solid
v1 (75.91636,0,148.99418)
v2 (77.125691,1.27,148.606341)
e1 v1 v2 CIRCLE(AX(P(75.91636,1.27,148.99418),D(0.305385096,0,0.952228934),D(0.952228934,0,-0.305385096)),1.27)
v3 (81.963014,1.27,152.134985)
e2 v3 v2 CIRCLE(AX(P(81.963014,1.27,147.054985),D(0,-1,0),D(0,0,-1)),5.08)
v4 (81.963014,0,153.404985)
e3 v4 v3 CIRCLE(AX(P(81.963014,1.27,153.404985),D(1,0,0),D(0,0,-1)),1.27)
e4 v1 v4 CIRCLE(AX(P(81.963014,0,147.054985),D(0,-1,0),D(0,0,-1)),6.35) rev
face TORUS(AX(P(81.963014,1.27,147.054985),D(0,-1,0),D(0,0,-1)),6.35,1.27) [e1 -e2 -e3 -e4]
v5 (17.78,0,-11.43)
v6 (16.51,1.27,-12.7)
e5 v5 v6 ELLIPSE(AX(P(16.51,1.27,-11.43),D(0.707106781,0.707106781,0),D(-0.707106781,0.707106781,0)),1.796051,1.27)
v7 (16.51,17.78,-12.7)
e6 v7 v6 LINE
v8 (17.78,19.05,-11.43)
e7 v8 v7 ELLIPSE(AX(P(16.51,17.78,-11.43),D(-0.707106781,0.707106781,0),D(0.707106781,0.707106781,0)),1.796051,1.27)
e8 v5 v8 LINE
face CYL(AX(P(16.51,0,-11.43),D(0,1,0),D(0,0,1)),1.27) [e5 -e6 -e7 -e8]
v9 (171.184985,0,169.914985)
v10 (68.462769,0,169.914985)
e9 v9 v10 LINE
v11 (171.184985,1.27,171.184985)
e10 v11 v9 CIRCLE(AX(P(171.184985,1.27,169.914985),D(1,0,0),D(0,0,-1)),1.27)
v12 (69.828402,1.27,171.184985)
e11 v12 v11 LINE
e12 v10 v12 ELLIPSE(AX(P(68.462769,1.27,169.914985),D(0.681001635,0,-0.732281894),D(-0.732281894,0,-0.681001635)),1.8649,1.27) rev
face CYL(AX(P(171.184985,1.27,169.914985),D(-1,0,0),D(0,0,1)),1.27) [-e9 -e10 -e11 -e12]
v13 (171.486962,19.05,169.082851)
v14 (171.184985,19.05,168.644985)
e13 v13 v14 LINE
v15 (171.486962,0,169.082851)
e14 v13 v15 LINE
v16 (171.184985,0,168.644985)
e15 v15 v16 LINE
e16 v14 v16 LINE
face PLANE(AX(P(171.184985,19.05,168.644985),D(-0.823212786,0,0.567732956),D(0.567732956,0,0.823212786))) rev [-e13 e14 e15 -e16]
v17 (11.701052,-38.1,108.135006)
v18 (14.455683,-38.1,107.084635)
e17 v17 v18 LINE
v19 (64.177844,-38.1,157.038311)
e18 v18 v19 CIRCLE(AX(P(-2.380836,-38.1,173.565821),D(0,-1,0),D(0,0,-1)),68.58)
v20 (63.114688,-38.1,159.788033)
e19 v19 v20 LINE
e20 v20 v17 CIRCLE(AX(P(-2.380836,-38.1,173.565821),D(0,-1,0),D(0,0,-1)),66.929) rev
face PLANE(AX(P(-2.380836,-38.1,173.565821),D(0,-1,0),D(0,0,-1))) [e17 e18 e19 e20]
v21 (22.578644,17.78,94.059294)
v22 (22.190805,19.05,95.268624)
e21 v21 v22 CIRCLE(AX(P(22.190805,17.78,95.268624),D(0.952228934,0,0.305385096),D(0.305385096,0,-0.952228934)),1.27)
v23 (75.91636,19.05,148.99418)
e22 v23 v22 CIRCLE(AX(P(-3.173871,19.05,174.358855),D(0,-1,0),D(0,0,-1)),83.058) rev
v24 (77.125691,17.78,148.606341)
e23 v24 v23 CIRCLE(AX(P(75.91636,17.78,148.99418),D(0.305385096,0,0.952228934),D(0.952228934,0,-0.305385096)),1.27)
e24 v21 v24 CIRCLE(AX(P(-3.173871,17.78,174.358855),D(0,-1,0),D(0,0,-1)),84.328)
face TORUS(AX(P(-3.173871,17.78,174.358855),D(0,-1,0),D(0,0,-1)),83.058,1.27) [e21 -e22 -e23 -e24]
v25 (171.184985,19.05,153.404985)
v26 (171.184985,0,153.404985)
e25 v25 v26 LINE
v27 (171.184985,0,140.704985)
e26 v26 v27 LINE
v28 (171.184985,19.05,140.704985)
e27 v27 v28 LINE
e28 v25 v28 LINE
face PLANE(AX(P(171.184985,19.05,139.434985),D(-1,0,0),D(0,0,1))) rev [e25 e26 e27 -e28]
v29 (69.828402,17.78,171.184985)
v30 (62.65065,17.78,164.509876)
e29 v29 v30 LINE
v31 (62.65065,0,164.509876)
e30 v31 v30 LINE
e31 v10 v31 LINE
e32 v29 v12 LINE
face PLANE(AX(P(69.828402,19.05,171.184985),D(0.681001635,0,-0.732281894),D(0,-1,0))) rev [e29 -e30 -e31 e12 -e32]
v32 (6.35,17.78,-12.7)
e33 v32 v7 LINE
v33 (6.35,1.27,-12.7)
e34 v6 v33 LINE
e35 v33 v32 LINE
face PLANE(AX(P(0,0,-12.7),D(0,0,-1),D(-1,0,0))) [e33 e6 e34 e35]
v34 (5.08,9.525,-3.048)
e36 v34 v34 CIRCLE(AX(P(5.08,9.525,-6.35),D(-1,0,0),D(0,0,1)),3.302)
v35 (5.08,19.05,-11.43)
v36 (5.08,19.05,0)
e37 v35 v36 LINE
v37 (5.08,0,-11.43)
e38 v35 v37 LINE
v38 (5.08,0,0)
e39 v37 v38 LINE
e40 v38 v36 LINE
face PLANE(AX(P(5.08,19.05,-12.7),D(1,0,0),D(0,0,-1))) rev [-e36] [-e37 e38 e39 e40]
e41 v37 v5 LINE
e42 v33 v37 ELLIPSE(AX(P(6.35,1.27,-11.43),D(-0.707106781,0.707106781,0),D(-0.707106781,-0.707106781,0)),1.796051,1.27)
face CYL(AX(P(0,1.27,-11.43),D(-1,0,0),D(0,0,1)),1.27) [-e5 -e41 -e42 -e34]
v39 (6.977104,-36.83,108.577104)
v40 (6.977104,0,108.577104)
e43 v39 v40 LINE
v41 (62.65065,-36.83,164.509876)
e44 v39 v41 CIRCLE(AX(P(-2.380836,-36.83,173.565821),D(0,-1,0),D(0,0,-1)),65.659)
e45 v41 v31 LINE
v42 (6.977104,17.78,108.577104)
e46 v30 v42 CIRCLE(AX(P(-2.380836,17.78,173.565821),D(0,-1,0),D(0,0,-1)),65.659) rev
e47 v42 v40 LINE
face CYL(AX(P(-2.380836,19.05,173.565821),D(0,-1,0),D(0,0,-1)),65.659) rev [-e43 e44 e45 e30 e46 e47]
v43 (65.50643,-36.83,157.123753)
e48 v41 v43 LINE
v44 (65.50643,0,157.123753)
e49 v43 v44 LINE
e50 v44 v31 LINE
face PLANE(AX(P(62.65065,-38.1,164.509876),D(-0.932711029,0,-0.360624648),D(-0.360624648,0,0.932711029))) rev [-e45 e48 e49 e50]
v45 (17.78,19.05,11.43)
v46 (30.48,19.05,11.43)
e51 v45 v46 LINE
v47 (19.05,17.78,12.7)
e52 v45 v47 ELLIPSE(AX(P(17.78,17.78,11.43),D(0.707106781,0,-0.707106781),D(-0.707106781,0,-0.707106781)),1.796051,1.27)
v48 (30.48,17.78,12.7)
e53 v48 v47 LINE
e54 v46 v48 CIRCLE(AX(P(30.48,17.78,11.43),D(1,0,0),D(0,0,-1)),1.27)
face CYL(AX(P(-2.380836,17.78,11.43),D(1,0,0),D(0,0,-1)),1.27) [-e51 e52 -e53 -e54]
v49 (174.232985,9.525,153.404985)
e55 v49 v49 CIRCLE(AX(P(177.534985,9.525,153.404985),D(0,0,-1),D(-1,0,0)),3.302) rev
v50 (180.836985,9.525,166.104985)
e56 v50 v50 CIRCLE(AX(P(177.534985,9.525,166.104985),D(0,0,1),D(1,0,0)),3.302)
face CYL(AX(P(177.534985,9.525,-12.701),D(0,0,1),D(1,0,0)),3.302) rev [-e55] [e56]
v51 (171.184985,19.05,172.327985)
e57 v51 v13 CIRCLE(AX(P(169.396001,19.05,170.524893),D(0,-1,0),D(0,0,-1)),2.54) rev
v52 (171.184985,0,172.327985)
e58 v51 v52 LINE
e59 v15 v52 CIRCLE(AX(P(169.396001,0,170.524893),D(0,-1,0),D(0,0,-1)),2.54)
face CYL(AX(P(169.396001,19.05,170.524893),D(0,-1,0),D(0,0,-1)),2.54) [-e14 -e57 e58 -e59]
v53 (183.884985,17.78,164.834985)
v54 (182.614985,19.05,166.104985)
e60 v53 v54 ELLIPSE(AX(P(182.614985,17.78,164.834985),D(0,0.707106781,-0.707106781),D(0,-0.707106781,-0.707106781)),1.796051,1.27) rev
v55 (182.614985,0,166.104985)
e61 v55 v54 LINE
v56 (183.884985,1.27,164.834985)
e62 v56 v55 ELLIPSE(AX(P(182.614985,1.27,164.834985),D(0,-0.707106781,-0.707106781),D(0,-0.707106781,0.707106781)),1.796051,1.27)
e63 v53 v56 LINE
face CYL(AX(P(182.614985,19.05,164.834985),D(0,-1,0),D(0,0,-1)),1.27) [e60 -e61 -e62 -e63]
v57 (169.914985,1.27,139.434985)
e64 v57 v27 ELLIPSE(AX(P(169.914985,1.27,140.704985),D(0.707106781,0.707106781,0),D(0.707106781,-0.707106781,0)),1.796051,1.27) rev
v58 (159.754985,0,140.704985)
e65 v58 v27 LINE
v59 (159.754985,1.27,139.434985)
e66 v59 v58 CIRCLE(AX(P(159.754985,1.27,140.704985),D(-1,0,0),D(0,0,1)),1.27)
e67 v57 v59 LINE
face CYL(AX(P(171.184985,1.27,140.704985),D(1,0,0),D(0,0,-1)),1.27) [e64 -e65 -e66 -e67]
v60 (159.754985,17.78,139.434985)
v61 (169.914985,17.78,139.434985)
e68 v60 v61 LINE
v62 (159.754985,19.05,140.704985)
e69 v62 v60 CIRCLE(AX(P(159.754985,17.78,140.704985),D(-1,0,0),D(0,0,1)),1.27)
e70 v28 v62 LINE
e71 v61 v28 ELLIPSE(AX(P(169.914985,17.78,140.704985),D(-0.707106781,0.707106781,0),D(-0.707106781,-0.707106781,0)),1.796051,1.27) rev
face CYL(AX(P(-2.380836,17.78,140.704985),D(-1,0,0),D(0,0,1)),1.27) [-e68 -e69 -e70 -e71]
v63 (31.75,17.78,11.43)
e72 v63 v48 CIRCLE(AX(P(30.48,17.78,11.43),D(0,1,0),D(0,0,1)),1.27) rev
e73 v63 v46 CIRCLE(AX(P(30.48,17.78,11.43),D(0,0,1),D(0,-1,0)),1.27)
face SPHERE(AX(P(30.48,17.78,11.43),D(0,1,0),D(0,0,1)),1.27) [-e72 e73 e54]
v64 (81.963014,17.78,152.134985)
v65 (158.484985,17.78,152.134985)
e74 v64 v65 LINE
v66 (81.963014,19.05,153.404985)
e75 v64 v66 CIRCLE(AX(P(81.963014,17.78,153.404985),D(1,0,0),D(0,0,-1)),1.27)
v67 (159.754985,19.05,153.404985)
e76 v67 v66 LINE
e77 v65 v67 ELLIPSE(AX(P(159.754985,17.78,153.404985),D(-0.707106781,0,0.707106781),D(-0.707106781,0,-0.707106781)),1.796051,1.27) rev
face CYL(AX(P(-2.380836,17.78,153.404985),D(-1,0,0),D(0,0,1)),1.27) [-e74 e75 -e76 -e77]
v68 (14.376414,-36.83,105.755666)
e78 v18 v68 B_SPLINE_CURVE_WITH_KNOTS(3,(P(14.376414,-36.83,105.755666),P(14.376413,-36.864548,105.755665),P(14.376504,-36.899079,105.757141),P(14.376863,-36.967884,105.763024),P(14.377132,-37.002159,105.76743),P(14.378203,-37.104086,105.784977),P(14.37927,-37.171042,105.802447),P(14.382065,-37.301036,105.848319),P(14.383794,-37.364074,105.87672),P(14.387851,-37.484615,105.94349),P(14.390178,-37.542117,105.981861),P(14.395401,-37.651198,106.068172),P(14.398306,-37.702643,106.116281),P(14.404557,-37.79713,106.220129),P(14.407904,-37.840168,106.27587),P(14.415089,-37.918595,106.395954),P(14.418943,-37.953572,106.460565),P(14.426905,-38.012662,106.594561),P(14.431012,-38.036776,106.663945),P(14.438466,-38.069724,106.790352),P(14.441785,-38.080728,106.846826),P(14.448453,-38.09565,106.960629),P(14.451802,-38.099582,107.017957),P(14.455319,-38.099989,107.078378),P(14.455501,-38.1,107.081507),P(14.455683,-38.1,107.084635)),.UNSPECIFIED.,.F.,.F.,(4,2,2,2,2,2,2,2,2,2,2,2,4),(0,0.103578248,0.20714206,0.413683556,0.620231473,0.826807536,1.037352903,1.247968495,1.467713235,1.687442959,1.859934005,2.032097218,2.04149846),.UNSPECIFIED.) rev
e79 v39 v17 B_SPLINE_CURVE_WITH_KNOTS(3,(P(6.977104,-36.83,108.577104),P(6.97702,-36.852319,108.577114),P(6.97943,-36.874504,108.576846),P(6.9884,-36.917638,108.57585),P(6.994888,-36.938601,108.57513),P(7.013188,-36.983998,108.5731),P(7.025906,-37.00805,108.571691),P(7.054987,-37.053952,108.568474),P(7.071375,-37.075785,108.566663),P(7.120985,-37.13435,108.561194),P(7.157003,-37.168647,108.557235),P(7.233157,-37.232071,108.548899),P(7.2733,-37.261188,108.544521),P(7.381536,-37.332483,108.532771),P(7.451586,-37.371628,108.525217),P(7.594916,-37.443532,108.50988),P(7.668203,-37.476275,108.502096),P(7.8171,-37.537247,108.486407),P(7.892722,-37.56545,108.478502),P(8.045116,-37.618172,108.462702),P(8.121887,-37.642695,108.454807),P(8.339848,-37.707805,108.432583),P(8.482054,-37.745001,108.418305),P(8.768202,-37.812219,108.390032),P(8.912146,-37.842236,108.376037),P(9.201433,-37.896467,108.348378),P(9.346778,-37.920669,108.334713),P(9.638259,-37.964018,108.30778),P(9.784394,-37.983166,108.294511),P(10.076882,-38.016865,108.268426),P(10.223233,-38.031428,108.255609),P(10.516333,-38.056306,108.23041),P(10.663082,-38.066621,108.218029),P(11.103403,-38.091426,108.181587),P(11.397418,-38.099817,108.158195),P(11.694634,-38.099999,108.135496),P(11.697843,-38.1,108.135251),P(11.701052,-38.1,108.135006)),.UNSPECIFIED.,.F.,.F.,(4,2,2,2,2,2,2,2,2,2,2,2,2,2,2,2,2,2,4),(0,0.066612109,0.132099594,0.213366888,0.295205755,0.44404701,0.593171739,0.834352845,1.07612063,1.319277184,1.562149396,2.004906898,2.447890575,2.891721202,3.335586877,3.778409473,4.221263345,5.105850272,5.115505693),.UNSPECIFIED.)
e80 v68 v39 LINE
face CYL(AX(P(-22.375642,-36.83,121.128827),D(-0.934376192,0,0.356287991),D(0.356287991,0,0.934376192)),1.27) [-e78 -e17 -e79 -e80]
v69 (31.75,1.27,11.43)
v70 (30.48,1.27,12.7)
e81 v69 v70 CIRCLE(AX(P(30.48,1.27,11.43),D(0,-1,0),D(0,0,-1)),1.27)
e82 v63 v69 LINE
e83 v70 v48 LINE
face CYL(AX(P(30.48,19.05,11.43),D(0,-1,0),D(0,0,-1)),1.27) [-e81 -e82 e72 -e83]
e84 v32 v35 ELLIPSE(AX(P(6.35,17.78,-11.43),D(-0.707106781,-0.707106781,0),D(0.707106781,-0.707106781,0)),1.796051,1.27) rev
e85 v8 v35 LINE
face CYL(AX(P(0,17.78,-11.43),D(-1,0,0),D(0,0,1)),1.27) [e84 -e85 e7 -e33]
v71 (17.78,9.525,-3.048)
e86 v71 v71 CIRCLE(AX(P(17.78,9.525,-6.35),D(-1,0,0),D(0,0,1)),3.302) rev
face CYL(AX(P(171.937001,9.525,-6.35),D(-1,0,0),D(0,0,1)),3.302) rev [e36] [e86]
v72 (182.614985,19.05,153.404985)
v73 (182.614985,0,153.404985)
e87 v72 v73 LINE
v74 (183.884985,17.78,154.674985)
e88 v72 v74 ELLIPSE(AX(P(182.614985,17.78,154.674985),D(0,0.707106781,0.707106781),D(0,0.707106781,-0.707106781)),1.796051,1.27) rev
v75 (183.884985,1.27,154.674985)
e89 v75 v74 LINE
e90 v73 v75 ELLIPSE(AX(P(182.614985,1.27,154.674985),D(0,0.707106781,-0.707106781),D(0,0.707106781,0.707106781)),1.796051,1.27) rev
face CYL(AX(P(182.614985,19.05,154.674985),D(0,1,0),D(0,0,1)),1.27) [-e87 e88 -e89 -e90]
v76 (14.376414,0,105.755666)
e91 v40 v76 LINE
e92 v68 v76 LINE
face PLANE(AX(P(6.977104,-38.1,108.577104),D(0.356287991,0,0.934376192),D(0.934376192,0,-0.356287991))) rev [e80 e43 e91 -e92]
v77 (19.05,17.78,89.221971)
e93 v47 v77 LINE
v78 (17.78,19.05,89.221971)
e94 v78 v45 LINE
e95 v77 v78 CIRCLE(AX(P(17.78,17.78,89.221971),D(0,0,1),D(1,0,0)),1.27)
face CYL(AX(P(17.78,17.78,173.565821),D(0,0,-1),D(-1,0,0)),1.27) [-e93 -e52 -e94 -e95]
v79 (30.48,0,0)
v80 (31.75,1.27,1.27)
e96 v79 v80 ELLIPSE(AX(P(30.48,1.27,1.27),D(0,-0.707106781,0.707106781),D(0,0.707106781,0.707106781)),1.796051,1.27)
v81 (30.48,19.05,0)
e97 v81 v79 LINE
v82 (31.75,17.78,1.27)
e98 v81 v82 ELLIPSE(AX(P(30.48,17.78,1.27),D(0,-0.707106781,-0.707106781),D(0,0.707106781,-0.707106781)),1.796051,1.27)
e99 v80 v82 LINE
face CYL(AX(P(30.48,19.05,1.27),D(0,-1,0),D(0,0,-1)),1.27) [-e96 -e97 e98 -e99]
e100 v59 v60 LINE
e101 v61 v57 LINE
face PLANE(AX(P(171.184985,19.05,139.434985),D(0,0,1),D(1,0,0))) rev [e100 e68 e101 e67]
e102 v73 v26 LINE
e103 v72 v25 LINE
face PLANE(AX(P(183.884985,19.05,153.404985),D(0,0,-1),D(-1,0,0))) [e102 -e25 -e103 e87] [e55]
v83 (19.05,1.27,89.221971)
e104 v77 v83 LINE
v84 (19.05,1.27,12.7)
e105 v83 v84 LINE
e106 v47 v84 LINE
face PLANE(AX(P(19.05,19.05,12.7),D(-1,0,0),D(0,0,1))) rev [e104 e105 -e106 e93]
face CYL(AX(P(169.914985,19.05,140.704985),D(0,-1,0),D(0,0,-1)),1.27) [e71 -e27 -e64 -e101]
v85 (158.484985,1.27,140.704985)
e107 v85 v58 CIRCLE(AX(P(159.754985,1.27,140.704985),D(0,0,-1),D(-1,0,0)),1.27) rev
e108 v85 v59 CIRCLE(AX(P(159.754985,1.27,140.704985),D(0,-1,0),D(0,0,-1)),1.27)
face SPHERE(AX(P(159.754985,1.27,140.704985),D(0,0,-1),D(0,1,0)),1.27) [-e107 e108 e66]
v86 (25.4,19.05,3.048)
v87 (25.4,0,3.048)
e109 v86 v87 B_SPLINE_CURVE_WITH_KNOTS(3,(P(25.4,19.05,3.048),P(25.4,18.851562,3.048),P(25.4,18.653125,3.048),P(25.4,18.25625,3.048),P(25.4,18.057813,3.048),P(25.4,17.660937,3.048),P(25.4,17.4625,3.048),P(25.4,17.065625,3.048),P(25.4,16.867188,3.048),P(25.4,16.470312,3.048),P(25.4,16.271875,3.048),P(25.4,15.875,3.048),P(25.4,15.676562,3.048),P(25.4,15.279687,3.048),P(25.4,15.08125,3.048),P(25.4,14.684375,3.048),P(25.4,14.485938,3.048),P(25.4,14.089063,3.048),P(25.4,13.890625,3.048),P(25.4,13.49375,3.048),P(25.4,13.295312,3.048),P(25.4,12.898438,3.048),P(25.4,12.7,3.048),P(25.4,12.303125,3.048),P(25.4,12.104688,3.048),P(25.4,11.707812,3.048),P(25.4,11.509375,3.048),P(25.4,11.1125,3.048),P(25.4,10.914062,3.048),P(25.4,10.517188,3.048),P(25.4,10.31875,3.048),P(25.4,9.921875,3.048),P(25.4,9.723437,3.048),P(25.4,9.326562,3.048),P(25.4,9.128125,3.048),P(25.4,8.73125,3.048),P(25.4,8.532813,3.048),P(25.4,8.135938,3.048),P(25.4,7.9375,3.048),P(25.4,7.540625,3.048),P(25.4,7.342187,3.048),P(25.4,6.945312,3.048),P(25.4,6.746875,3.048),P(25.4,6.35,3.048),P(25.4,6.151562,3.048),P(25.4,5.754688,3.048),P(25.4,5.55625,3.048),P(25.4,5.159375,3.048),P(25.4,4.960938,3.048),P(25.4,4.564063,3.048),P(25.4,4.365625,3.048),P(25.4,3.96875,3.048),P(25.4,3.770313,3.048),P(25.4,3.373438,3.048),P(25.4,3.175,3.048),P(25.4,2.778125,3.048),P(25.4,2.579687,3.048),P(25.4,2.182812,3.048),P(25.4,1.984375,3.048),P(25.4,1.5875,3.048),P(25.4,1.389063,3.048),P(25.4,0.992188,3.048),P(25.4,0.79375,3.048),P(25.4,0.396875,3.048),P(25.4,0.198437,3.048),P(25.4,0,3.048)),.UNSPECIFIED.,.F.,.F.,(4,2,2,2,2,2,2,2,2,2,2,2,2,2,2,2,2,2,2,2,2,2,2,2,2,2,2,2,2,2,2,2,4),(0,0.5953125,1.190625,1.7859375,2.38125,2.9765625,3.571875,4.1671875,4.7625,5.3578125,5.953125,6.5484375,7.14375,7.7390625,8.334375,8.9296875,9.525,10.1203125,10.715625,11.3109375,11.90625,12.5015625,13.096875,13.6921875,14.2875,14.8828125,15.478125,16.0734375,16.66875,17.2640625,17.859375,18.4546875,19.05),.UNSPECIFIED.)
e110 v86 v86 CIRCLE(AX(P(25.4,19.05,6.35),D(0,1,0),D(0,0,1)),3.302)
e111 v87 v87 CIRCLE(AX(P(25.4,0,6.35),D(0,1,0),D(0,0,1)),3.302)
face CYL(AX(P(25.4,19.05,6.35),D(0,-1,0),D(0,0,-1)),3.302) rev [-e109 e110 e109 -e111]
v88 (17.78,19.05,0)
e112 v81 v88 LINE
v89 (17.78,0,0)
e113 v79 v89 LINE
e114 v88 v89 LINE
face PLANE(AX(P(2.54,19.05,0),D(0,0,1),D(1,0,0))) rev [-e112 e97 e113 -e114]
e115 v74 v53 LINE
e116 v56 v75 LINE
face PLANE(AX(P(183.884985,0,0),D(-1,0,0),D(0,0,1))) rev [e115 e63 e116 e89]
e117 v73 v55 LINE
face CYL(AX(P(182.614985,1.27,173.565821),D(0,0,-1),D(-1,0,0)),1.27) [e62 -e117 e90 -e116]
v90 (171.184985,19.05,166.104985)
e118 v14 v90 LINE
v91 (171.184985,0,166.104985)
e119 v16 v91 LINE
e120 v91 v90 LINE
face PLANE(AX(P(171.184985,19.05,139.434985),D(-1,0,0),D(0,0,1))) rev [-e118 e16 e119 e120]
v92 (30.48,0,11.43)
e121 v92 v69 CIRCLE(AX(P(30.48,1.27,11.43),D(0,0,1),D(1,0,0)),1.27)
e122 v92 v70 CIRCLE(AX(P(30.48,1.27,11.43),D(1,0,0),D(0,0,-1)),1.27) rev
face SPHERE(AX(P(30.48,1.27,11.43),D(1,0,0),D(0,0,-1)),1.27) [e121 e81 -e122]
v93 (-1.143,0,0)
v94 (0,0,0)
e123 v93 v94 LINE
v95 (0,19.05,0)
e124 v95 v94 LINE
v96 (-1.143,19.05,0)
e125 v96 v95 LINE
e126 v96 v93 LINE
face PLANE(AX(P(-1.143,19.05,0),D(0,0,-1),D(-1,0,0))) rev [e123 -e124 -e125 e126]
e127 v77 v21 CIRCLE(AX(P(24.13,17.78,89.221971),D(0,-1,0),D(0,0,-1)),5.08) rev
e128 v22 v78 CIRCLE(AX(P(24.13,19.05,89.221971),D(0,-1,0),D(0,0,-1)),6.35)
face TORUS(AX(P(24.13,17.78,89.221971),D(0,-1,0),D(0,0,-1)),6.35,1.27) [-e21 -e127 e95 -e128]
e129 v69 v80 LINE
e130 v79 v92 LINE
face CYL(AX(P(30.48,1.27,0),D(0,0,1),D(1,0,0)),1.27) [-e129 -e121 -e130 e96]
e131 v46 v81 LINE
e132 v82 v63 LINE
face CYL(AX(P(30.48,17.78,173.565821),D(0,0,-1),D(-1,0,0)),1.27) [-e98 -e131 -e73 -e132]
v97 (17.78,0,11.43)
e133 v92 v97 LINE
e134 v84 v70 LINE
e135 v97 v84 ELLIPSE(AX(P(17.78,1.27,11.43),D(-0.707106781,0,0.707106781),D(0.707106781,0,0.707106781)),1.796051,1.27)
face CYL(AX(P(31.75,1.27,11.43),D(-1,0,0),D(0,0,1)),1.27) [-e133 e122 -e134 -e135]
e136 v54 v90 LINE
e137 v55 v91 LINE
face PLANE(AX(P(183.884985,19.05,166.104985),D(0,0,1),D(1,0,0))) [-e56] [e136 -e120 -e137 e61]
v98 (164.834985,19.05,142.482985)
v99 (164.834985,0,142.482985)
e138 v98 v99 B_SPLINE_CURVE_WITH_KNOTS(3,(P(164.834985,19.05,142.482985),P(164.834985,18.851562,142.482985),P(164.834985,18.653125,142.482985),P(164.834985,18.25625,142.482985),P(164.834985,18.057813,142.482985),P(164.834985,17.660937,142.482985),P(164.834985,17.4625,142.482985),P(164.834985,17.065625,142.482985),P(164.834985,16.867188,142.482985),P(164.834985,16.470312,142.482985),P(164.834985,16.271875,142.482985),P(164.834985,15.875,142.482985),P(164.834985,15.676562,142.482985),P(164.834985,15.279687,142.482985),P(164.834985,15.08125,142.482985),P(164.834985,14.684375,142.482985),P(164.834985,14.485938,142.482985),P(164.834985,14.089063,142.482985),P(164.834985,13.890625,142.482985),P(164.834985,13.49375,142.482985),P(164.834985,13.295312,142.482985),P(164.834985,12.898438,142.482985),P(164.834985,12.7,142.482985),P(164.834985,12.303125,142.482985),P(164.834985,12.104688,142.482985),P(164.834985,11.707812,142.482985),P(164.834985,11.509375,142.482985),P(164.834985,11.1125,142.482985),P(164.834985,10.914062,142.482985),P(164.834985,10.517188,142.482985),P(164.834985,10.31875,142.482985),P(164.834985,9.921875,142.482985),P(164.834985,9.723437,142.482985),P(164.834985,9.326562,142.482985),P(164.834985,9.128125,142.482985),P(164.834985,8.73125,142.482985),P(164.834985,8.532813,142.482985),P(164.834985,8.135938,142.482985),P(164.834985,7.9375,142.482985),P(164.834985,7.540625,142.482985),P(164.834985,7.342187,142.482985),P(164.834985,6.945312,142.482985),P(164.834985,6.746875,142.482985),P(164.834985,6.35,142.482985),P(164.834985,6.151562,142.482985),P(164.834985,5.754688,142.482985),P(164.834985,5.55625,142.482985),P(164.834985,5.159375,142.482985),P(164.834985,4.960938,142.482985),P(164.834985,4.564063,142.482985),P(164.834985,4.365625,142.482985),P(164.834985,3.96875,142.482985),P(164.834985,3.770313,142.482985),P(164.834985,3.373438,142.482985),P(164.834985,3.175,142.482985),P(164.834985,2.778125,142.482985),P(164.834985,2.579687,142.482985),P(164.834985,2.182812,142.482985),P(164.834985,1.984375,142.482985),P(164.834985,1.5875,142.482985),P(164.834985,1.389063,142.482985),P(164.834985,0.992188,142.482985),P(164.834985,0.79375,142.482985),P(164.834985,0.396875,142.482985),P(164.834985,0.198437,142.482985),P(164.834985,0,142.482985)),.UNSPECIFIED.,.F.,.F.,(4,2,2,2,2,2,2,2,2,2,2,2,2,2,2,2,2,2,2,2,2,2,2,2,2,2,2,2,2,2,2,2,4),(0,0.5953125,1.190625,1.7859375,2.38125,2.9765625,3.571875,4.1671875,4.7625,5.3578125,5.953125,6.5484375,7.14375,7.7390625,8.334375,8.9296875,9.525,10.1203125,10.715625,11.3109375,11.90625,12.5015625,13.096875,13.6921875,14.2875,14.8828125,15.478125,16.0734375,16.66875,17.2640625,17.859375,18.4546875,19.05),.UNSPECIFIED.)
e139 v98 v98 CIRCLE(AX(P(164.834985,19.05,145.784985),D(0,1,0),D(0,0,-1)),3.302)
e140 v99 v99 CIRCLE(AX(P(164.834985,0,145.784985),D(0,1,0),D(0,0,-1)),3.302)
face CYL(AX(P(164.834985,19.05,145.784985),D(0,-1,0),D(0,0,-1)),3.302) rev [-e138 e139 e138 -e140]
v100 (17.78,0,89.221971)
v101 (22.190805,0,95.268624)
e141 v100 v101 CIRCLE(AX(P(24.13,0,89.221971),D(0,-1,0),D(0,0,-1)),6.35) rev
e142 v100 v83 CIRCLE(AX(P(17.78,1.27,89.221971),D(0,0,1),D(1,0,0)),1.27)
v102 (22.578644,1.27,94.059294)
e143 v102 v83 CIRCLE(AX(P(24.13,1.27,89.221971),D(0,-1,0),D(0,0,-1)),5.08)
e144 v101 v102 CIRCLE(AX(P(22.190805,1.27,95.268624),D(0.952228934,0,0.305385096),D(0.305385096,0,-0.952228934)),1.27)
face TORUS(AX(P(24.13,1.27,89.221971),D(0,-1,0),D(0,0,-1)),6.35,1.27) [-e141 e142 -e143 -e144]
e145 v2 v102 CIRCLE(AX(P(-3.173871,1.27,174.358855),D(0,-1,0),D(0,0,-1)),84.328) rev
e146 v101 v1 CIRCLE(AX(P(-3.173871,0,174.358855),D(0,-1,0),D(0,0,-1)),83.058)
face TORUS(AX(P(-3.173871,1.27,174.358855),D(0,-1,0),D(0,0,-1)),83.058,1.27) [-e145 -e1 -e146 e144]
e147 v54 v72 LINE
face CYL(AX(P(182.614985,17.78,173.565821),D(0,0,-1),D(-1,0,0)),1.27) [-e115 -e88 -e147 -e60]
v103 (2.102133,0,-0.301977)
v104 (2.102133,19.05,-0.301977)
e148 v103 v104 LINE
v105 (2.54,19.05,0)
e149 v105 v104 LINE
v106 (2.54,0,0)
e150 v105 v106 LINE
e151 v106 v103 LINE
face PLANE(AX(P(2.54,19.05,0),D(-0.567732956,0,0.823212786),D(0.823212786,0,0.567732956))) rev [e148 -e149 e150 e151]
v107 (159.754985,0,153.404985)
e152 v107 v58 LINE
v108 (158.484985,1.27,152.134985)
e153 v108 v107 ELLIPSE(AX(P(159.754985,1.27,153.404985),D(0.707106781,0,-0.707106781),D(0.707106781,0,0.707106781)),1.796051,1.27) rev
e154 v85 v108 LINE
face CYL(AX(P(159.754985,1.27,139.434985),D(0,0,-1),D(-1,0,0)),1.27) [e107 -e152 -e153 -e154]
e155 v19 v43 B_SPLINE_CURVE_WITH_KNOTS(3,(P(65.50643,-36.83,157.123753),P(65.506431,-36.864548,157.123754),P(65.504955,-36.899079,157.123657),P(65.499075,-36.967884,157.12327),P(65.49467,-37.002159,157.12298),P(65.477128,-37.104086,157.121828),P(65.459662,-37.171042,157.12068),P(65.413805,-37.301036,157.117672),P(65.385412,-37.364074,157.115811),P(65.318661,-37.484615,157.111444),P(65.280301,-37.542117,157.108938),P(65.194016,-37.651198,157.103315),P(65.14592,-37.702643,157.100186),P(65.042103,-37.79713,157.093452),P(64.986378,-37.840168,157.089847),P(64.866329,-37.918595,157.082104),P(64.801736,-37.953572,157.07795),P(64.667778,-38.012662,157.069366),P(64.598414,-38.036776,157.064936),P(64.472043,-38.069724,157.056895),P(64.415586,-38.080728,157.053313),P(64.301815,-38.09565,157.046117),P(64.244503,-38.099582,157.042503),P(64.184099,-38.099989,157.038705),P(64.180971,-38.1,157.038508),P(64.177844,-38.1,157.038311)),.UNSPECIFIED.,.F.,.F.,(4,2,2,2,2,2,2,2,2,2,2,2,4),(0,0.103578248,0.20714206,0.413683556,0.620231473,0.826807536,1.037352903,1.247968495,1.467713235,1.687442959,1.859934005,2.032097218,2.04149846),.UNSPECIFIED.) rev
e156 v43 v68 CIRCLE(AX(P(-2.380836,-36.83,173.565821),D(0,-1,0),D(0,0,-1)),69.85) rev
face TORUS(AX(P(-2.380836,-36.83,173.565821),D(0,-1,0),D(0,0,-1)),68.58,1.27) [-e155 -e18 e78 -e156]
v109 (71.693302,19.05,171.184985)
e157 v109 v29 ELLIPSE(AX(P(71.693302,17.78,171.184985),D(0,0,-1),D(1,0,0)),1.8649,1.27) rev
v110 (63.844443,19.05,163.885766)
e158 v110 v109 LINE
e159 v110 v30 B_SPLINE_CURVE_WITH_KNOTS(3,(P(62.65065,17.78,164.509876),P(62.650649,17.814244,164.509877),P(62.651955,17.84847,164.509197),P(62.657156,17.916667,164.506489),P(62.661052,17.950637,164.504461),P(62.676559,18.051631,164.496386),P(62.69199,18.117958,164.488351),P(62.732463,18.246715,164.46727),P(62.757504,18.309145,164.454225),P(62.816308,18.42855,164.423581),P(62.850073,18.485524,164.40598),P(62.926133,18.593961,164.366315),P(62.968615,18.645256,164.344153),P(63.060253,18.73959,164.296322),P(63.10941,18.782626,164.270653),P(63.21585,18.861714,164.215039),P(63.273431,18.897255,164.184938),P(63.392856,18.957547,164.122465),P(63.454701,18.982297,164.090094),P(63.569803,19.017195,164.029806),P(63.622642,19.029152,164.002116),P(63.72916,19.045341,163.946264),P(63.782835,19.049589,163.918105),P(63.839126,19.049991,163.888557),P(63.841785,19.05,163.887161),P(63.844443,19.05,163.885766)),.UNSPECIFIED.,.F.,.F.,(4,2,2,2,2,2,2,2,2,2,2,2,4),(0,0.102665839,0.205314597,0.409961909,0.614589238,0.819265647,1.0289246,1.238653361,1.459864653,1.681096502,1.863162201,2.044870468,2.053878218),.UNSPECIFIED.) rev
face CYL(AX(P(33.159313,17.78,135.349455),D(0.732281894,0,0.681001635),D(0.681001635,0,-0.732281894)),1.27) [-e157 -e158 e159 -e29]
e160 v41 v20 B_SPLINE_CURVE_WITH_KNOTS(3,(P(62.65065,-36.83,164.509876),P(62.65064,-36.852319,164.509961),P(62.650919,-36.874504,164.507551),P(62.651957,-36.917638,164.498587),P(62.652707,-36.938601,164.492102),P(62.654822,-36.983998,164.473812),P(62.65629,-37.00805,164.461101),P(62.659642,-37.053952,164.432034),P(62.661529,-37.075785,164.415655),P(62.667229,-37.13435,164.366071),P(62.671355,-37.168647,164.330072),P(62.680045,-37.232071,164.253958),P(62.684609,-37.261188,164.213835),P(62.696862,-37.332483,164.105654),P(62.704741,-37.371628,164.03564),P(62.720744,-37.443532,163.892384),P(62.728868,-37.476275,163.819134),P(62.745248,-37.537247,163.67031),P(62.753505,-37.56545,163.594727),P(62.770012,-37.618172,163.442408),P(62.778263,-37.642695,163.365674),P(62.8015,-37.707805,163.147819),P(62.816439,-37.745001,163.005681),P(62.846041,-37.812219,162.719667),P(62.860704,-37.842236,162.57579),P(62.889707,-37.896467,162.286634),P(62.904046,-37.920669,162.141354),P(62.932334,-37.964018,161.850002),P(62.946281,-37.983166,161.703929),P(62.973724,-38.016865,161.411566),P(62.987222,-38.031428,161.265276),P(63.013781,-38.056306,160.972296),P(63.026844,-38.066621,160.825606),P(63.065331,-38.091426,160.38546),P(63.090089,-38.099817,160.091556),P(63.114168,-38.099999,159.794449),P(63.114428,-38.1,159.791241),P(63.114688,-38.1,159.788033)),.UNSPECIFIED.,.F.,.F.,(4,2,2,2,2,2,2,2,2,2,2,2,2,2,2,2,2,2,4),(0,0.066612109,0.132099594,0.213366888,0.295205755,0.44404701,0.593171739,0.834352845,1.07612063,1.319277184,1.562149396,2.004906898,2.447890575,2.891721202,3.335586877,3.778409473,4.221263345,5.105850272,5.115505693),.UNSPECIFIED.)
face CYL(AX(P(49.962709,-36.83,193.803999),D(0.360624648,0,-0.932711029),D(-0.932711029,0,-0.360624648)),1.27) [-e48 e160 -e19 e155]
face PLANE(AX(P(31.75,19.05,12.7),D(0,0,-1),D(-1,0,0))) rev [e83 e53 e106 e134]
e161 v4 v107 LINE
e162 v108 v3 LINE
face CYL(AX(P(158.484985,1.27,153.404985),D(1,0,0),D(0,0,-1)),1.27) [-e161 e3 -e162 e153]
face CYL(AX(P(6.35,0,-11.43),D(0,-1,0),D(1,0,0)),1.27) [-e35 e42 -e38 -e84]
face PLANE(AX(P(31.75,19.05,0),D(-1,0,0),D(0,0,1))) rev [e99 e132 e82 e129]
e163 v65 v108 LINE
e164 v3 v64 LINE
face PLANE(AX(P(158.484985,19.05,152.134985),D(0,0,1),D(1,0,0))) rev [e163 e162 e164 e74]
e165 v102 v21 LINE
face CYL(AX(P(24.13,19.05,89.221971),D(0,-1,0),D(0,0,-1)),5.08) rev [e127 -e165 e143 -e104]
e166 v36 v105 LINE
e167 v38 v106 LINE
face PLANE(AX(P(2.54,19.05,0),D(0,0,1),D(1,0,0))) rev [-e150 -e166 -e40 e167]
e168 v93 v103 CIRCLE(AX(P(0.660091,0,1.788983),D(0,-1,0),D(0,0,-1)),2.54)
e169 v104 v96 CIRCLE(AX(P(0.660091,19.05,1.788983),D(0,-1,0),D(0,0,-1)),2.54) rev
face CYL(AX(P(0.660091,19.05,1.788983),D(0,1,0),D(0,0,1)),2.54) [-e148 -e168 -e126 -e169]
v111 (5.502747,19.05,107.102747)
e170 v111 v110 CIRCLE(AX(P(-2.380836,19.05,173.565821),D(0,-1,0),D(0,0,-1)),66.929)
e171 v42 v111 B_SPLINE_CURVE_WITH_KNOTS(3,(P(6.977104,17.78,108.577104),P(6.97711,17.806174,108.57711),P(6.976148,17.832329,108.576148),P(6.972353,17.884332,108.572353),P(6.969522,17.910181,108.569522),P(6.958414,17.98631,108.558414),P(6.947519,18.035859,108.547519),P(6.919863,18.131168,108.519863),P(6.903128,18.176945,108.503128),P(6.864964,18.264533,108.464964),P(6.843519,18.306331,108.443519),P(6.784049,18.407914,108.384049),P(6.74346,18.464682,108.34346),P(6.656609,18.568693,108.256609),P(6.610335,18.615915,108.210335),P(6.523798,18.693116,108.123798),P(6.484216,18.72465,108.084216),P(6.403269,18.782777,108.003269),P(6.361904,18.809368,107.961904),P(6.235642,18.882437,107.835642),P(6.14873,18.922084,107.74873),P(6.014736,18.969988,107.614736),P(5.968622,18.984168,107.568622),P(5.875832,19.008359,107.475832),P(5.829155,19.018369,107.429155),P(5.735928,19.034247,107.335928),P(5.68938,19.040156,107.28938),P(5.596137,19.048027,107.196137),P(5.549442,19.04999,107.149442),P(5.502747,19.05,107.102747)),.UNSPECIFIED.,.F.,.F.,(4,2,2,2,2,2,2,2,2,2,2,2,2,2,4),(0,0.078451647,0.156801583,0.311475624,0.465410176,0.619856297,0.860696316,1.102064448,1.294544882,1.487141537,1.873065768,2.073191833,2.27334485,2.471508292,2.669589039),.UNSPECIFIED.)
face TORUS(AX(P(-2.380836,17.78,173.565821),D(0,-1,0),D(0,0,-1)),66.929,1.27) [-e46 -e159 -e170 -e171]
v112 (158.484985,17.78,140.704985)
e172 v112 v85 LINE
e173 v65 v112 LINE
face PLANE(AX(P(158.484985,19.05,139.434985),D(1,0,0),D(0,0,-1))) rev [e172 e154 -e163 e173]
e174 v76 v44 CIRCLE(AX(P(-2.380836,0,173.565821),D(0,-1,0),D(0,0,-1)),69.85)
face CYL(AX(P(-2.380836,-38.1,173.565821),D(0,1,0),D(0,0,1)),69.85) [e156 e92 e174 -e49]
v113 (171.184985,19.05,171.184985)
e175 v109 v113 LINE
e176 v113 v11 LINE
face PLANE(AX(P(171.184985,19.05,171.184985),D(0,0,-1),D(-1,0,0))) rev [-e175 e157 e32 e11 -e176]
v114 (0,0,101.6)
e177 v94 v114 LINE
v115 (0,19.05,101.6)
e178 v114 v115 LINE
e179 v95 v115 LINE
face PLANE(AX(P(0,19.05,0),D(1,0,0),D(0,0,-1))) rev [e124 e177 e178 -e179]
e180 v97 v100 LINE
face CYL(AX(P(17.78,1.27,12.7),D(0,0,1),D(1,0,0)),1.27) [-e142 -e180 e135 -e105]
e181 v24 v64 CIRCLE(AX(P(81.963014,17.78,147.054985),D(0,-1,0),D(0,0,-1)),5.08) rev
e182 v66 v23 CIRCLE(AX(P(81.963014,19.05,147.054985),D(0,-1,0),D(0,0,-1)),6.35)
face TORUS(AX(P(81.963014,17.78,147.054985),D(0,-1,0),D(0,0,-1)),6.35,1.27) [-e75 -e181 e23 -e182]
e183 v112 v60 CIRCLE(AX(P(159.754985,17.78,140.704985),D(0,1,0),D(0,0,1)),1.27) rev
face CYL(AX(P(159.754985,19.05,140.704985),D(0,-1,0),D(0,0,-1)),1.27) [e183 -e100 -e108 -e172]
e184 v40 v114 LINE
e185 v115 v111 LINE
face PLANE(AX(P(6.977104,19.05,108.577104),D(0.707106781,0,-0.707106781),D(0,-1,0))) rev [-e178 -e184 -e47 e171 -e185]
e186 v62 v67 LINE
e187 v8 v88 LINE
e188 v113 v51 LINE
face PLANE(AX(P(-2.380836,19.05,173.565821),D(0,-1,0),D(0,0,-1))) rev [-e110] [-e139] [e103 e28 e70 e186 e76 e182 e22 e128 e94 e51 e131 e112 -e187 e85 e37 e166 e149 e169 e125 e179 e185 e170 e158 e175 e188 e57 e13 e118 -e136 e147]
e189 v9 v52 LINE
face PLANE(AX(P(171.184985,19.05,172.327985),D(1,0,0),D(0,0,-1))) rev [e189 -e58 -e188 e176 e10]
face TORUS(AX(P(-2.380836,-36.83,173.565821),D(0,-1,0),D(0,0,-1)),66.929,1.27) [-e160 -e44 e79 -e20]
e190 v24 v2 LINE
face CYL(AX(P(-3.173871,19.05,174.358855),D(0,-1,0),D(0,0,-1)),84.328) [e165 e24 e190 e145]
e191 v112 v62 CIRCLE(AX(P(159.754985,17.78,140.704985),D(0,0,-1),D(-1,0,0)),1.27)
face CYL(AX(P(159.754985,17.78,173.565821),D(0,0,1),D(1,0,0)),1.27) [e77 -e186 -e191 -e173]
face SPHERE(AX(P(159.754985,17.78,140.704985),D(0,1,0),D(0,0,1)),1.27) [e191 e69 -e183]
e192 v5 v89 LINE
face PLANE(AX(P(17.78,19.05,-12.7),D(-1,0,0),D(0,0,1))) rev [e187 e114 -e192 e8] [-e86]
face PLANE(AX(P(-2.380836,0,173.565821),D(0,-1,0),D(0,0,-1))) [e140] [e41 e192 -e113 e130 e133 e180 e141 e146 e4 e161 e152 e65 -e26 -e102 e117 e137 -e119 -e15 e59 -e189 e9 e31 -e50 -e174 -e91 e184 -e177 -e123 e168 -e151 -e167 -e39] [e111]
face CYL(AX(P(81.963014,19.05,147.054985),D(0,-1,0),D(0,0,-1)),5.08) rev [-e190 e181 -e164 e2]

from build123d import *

# Parameters (mm, degrees)
SKETCH1_R           = 3.302
BOSS_EXTRUDE1_DEPTH = 19.05
CHAMFER1_SIZE       = 6.593417442
CHAMFER1_SIZE_2     = 6.35
FILLET1_R           = 5.08
FILLET2_R           = 1.27
FILLET3_R           = 1.27
BOSS_EXTRUDE2_START = 38.1
BOSS_EXTRUDE2_DEPTH = 38.1
FILLET5_R           = 2.54
FILLET6_R           = 1.27
SKETCH7_W           = 12.7
SKETCH7_H           = 19.05
BOSS_EXTRUDE3_DEPTH = 12.7
CUT_EXTRUDE5_REACH  = 244.877
SKETCH8_R           = 3.302
SKETCH9_W           = 12.7
SKETCH9_H           = 19.05
BOSS_EXTRUDE4_DEPTH = 12.7
CUT_EXTRUDE6_REACH  = 261.3
SKETCH10_R          = 3.302
FILLET7_R           = 1.27


with BuildPart() as part:
    # Sketch1 → Boss-Extrude1 (new body)
    with BuildSketch(Plane(origin=(0, 0, 0), x_dir=(1, 0, 0), z_dir=(0, 1, 0))):
        with BuildLine():
            Line((0, 0), (0, -107.95))
            ThreePointArc((0, -107.95), (44.047088178, -127.137896363), (63.234984541, -171.184984541))
            Line((63.234984541, -171.184984541), (171.184984541, -171.184984541))
            Line((171.184984541, -171.184984541), (171.184984541, -172.327984541))
            Line((171.184984541, -172.327984541), (173.724984541, -172.327984541))
            Line((173.724984541, -172.327984541), (171.184984541, -168.644984541))
            Line((171.184984541, -168.644984541), (171.184984541, -139.434984541))
            Line((171.184984541, -139.434984541), (158.484984541, -139.434984541))
            Line((158.484984541, -139.434984541), (158.484984541, -152.134984541))
            Line((158.484984541, -152.134984541), (78.172986392, -152.134984541))
            ThreePointArc((78.172986392, -152.134984541), (56.455029962, -114.729954579), (19.05, -93.011998149))
            Line((19.05, -93.011998149), (19.05, -12.7))
            Line((19.05, -12.7), (31.75, -12.7))
            Line((31.75, -12.7), (31.75, 0))
            Line((31.75, 0), (2.54, 0))
            Line((2.54, 0), (-1.143, 2.54))
            Line((-1.143, 2.54), (-1.143, 0))
            Line((-1.143, 0), (0, 0))
        make_face()
        with Locations(Location((25.4, -6.35, 0), (0, 0, 90))):
            Circle(SKETCH1_R, mode=Mode.SUBTRACT)
        with Locations(Location((164.834984541, -145.784984541, 0), (0, 0, 90))):
            Circle(SKETCH1_R, mode=Mode.SUBTRACT)
    extrude(amount=BOSS_EXTRUDE1_DEPTH)

    # Chamfer1
    # the kernel refuses this chamfer: 6.593417442, 6.35 mm, written as the material it takes off along each edge
    with BuildSketch(Plane(origin=(63.234984541, -17.246656522, 171.184984541), x_dir=(-0.0872058515963271, 0, -0.9961903128656489), z_dir=(0, 1, 0))) as chamfer1_piece_1:
        with BuildLine():
            Line((6.700635555, 0), (-CHAMFER1_SIZE * 0.0872058515927, -CHAMFER1_SIZE * 0.996190312824))
            Line((-CHAMFER1_SIZE * 0.0872058515927, -CHAMFER1_SIZE * 0.996190312824), (0, 0))
            ThreePointArc((0, 0), (3.448459053, -0.085459063), (6.700635555, 0))
        make_face()
    extrude(amount=53.543313044, mode=Mode.SUBTRACT)
    with BuildSketch(Plane(origin=(0, -18.02411909, 107.95), x_dir=(0, 0, -1), z_dir=(0, 1, 0))) as chamfer1_piece_2:
        with BuildLine():
            Line((CHAMFER1_SIZE_2, 0), (-0.627104296, -6.977104296))
            ThreePointArc((-0.627104296, -6.977104296), (-0.229600221, -3.597999822), (0, 0))
            Line((0, 0), (CHAMFER1_SIZE_2, 0))
        make_face()
    extrude(amount=55.098238181, mode=Mode.SUBTRACT)

    # Fillet1
    fillet1_edges = [part.edges().sort_by_distance(p)[0] for p in [
        (19.05, 9.525, 93.011998149),
        (78.172986392, 9.525, 152.134984541),
    ]]
    fillet(fillet1_edges, radius=FILLET1_R)

    # Fillet2
    fillet2_edges = [part.edges().sort_by_distance(p)[0] for p in [
        (158.484984541, 19.05, 145.784984541),
        (120.223999201, 19.05, 152.134984541),
        (31.75, 0, 6.35),
        (25.4, 0, 12.7),
        (120.223999201, 0, 152.134984541),
        (158.484984541, 0, 145.784984541),
        (164.834984541, 0, 139.434984541),
        (25.4, 19.05, 12.7),
        (31.75, 9.525, 0),
        (31.75, 9.525, 12.7),
        (158.484984541, 9.525, 139.434984541),
        (171.184984541, 9.525, 139.434984541),
        (31.75, 19.05, 6.35),
        (44.154800127, 19.05, 127.245858784),
        (66.239525947, 19.05, 167.847430426),
        (56.455029962, 0, 114.729954579),
        (56.455029962, 19.05, 114.729954579),
        (19.05, 0, 50.96098534),
        (19.05, 19.05, 50.96098534),
        (78.969227792, 0, 151.159085536),
        (78.969227792, 19.05, 151.159085536),
        (20.025899005, 0, 92.215756749),
        (20.025899005, 19.05, 92.215756749),
        (164.834984541, 19.05, 139.434984541),
    ]]
    fillet(fillet2_edges, radius=FILLET2_R)

    # Fillet3
    fillet3_edges = [part.edges().sort_by_distance(p)[0] for p in [
        (120.506693262, 0, 171.184984541),
    ]]
    fillet(fillet3_edges, radius=FILLET3_R)

    # Sketch6 → Boss-Extrude2 (add)
    with BuildSketch(Plane.XZ.offset(BOSS_EXTRUDE2_START)):
        with BuildLine():
            Line((6.977104296, 108.577104296), (14.376413508, 105.755665739))
            ThreePointArc((14.376413508, 105.755665739), (47.125159878, 124.289265483), (65.50643038, 157.123753494))
            Line((65.50643038, 157.123753494), (62.650649911, 164.509876311))
            ThreePointArc((62.650649911, 164.509876311), (44.154800127, 127.245858784), (6.977104296, 108.577104296))
        make_face()
    extrude(amount=-BOSS_EXTRUDE2_DEPTH)

    # Fillet5
    # the kernel refuses this fillet: 2.54 mm, written as the material it takes off along each edge
    with BuildSketch(Plane(origin=(173.724984541, -9.855086022, 172.327984541), x_dir=(-0.5677329558036762, 0, -0.8232127859152948), z_dir=(0, 1, 0))) as fillet5_piece_1:
        with BuildLine():
            CenterArc((3.942034409, 2.54), FILLET5_R, 190.182679729, 79.817320271)
            Line((1.442041708, 2.090960476), (0, 0))
            Line((0, 0), (3.942034409, 0))
        make_face()
    extrude(amount=38.760172045, mode=Mode.SUBTRACT)
    with BuildSketch(Plane(origin=(-1.143, -9.855086022, -2.54), x_dir=(0, 0, 1), z_dir=(0, 1, 0))) as fillet5_piece_2:
        with BuildLine():
            CenterArc((4.328983323, 1.80309142), FILLET5_R, 145.407711312, 79.817320271)
            Line((2.238022847, 3.245133128), (0, 0))
            Line((0, 0), (2.54, 0))
        make_face()
    extrude(amount=38.760172045, mode=Mode.SUBTRACT)

    # Fillet6
    fillet6_edges = [part.edges().sort_by_distance(p)[0] for p in [
        (47.125159878, -38.1, 124.289265483),
        (64.078540146, -38.1, 160.816814902),
        (44.154800127, -38.1, 127.245858784),
        (10.676758902, -38.1, 107.166385018),
    ]]
    fillet(fillet6_edges, radius=FILLET6_R)

    # Sketch7 → Boss-Extrude3 (add)
    with BuildSketch(Plane(origin=(0, 0, 0), x_dir=(-1, 0, 0), z_dir=(0, 0, -1))):
        with Locations((-11.43, 9.525)):
            Rectangle(SKETCH7_W, SKETCH7_H)
    extrude(amount=BOSS_EXTRUDE3_DEPTH)

    # Sketch8 → Cut-Extrude5 (cut, up to next)
    with BuildSketch(Plane.ZY.offset(-5.08), mode=Mode.PRIVATE) as cut_extrude5_sk1:
        with Locations((-6.35, 9.525)):
            Circle(SKETCH8_R)
    cut_extrude5_tool1 = extrude(cut_extrude5_sk1.sketch, amount=-CUT_EXTRUDE5_REACH, mode=Mode.PRIVATE) & part.part
    add(cut_extrude5_tool1.solids().sort_by_distance((5.08, 9.525, -6.35))[0], mode=Mode.SUBTRACT)

    # Sketch9 → Boss-Extrude4 (add)
    with BuildSketch(Plane(origin=(171.184984541, 0, -171.184984541), x_dir=(0, 0, 1), z_dir=(-1, 0, 0))):
        with Locations((330.939969082, 9.525)):
            Rectangle(SKETCH9_W, SKETCH9_H)
    extrude(amount=-BOSS_EXTRUDE4_DEPTH)

    # Sketch10 → Cut-Extrude6 (cut, up to next)
    with BuildSketch(Plane.XY.offset(166.104984541), mode=Mode.PRIVATE) as cut_extrude6_sk1:
        with Locations((177.534984541, 9.525)):
            Circle(SKETCH10_R)
    cut_extrude6_tool1 = extrude(cut_extrude6_sk1.sketch, amount=-CUT_EXTRUDE6_REACH, mode=Mode.PRIVATE) & part.part
    add(cut_extrude6_tool1.solids().sort_by_distance((177.534985, 9.525, 166.104985))[0], mode=Mode.SUBTRACT)

    # Fillet7
    fillet7_edges = [part.edges().sort_by_distance(p)[0] for p in [
        (17.78, 9.525, -12.7),
        (11.43, 0, -12.7),
        (5.08, 9.525, -12.7),
        (11.43, 19.05, -12.7),
        (183.884984541, 9.525, 153.404984541),
        (183.884984541, 19.05, 159.754984541),
        (183.884984541, 9.525, 166.104984541),
        (183.884984541, 0, 159.754984541),
    ]]
    fillet(fillet7_edges, radius=FILLET7_R)


solid = part.part
